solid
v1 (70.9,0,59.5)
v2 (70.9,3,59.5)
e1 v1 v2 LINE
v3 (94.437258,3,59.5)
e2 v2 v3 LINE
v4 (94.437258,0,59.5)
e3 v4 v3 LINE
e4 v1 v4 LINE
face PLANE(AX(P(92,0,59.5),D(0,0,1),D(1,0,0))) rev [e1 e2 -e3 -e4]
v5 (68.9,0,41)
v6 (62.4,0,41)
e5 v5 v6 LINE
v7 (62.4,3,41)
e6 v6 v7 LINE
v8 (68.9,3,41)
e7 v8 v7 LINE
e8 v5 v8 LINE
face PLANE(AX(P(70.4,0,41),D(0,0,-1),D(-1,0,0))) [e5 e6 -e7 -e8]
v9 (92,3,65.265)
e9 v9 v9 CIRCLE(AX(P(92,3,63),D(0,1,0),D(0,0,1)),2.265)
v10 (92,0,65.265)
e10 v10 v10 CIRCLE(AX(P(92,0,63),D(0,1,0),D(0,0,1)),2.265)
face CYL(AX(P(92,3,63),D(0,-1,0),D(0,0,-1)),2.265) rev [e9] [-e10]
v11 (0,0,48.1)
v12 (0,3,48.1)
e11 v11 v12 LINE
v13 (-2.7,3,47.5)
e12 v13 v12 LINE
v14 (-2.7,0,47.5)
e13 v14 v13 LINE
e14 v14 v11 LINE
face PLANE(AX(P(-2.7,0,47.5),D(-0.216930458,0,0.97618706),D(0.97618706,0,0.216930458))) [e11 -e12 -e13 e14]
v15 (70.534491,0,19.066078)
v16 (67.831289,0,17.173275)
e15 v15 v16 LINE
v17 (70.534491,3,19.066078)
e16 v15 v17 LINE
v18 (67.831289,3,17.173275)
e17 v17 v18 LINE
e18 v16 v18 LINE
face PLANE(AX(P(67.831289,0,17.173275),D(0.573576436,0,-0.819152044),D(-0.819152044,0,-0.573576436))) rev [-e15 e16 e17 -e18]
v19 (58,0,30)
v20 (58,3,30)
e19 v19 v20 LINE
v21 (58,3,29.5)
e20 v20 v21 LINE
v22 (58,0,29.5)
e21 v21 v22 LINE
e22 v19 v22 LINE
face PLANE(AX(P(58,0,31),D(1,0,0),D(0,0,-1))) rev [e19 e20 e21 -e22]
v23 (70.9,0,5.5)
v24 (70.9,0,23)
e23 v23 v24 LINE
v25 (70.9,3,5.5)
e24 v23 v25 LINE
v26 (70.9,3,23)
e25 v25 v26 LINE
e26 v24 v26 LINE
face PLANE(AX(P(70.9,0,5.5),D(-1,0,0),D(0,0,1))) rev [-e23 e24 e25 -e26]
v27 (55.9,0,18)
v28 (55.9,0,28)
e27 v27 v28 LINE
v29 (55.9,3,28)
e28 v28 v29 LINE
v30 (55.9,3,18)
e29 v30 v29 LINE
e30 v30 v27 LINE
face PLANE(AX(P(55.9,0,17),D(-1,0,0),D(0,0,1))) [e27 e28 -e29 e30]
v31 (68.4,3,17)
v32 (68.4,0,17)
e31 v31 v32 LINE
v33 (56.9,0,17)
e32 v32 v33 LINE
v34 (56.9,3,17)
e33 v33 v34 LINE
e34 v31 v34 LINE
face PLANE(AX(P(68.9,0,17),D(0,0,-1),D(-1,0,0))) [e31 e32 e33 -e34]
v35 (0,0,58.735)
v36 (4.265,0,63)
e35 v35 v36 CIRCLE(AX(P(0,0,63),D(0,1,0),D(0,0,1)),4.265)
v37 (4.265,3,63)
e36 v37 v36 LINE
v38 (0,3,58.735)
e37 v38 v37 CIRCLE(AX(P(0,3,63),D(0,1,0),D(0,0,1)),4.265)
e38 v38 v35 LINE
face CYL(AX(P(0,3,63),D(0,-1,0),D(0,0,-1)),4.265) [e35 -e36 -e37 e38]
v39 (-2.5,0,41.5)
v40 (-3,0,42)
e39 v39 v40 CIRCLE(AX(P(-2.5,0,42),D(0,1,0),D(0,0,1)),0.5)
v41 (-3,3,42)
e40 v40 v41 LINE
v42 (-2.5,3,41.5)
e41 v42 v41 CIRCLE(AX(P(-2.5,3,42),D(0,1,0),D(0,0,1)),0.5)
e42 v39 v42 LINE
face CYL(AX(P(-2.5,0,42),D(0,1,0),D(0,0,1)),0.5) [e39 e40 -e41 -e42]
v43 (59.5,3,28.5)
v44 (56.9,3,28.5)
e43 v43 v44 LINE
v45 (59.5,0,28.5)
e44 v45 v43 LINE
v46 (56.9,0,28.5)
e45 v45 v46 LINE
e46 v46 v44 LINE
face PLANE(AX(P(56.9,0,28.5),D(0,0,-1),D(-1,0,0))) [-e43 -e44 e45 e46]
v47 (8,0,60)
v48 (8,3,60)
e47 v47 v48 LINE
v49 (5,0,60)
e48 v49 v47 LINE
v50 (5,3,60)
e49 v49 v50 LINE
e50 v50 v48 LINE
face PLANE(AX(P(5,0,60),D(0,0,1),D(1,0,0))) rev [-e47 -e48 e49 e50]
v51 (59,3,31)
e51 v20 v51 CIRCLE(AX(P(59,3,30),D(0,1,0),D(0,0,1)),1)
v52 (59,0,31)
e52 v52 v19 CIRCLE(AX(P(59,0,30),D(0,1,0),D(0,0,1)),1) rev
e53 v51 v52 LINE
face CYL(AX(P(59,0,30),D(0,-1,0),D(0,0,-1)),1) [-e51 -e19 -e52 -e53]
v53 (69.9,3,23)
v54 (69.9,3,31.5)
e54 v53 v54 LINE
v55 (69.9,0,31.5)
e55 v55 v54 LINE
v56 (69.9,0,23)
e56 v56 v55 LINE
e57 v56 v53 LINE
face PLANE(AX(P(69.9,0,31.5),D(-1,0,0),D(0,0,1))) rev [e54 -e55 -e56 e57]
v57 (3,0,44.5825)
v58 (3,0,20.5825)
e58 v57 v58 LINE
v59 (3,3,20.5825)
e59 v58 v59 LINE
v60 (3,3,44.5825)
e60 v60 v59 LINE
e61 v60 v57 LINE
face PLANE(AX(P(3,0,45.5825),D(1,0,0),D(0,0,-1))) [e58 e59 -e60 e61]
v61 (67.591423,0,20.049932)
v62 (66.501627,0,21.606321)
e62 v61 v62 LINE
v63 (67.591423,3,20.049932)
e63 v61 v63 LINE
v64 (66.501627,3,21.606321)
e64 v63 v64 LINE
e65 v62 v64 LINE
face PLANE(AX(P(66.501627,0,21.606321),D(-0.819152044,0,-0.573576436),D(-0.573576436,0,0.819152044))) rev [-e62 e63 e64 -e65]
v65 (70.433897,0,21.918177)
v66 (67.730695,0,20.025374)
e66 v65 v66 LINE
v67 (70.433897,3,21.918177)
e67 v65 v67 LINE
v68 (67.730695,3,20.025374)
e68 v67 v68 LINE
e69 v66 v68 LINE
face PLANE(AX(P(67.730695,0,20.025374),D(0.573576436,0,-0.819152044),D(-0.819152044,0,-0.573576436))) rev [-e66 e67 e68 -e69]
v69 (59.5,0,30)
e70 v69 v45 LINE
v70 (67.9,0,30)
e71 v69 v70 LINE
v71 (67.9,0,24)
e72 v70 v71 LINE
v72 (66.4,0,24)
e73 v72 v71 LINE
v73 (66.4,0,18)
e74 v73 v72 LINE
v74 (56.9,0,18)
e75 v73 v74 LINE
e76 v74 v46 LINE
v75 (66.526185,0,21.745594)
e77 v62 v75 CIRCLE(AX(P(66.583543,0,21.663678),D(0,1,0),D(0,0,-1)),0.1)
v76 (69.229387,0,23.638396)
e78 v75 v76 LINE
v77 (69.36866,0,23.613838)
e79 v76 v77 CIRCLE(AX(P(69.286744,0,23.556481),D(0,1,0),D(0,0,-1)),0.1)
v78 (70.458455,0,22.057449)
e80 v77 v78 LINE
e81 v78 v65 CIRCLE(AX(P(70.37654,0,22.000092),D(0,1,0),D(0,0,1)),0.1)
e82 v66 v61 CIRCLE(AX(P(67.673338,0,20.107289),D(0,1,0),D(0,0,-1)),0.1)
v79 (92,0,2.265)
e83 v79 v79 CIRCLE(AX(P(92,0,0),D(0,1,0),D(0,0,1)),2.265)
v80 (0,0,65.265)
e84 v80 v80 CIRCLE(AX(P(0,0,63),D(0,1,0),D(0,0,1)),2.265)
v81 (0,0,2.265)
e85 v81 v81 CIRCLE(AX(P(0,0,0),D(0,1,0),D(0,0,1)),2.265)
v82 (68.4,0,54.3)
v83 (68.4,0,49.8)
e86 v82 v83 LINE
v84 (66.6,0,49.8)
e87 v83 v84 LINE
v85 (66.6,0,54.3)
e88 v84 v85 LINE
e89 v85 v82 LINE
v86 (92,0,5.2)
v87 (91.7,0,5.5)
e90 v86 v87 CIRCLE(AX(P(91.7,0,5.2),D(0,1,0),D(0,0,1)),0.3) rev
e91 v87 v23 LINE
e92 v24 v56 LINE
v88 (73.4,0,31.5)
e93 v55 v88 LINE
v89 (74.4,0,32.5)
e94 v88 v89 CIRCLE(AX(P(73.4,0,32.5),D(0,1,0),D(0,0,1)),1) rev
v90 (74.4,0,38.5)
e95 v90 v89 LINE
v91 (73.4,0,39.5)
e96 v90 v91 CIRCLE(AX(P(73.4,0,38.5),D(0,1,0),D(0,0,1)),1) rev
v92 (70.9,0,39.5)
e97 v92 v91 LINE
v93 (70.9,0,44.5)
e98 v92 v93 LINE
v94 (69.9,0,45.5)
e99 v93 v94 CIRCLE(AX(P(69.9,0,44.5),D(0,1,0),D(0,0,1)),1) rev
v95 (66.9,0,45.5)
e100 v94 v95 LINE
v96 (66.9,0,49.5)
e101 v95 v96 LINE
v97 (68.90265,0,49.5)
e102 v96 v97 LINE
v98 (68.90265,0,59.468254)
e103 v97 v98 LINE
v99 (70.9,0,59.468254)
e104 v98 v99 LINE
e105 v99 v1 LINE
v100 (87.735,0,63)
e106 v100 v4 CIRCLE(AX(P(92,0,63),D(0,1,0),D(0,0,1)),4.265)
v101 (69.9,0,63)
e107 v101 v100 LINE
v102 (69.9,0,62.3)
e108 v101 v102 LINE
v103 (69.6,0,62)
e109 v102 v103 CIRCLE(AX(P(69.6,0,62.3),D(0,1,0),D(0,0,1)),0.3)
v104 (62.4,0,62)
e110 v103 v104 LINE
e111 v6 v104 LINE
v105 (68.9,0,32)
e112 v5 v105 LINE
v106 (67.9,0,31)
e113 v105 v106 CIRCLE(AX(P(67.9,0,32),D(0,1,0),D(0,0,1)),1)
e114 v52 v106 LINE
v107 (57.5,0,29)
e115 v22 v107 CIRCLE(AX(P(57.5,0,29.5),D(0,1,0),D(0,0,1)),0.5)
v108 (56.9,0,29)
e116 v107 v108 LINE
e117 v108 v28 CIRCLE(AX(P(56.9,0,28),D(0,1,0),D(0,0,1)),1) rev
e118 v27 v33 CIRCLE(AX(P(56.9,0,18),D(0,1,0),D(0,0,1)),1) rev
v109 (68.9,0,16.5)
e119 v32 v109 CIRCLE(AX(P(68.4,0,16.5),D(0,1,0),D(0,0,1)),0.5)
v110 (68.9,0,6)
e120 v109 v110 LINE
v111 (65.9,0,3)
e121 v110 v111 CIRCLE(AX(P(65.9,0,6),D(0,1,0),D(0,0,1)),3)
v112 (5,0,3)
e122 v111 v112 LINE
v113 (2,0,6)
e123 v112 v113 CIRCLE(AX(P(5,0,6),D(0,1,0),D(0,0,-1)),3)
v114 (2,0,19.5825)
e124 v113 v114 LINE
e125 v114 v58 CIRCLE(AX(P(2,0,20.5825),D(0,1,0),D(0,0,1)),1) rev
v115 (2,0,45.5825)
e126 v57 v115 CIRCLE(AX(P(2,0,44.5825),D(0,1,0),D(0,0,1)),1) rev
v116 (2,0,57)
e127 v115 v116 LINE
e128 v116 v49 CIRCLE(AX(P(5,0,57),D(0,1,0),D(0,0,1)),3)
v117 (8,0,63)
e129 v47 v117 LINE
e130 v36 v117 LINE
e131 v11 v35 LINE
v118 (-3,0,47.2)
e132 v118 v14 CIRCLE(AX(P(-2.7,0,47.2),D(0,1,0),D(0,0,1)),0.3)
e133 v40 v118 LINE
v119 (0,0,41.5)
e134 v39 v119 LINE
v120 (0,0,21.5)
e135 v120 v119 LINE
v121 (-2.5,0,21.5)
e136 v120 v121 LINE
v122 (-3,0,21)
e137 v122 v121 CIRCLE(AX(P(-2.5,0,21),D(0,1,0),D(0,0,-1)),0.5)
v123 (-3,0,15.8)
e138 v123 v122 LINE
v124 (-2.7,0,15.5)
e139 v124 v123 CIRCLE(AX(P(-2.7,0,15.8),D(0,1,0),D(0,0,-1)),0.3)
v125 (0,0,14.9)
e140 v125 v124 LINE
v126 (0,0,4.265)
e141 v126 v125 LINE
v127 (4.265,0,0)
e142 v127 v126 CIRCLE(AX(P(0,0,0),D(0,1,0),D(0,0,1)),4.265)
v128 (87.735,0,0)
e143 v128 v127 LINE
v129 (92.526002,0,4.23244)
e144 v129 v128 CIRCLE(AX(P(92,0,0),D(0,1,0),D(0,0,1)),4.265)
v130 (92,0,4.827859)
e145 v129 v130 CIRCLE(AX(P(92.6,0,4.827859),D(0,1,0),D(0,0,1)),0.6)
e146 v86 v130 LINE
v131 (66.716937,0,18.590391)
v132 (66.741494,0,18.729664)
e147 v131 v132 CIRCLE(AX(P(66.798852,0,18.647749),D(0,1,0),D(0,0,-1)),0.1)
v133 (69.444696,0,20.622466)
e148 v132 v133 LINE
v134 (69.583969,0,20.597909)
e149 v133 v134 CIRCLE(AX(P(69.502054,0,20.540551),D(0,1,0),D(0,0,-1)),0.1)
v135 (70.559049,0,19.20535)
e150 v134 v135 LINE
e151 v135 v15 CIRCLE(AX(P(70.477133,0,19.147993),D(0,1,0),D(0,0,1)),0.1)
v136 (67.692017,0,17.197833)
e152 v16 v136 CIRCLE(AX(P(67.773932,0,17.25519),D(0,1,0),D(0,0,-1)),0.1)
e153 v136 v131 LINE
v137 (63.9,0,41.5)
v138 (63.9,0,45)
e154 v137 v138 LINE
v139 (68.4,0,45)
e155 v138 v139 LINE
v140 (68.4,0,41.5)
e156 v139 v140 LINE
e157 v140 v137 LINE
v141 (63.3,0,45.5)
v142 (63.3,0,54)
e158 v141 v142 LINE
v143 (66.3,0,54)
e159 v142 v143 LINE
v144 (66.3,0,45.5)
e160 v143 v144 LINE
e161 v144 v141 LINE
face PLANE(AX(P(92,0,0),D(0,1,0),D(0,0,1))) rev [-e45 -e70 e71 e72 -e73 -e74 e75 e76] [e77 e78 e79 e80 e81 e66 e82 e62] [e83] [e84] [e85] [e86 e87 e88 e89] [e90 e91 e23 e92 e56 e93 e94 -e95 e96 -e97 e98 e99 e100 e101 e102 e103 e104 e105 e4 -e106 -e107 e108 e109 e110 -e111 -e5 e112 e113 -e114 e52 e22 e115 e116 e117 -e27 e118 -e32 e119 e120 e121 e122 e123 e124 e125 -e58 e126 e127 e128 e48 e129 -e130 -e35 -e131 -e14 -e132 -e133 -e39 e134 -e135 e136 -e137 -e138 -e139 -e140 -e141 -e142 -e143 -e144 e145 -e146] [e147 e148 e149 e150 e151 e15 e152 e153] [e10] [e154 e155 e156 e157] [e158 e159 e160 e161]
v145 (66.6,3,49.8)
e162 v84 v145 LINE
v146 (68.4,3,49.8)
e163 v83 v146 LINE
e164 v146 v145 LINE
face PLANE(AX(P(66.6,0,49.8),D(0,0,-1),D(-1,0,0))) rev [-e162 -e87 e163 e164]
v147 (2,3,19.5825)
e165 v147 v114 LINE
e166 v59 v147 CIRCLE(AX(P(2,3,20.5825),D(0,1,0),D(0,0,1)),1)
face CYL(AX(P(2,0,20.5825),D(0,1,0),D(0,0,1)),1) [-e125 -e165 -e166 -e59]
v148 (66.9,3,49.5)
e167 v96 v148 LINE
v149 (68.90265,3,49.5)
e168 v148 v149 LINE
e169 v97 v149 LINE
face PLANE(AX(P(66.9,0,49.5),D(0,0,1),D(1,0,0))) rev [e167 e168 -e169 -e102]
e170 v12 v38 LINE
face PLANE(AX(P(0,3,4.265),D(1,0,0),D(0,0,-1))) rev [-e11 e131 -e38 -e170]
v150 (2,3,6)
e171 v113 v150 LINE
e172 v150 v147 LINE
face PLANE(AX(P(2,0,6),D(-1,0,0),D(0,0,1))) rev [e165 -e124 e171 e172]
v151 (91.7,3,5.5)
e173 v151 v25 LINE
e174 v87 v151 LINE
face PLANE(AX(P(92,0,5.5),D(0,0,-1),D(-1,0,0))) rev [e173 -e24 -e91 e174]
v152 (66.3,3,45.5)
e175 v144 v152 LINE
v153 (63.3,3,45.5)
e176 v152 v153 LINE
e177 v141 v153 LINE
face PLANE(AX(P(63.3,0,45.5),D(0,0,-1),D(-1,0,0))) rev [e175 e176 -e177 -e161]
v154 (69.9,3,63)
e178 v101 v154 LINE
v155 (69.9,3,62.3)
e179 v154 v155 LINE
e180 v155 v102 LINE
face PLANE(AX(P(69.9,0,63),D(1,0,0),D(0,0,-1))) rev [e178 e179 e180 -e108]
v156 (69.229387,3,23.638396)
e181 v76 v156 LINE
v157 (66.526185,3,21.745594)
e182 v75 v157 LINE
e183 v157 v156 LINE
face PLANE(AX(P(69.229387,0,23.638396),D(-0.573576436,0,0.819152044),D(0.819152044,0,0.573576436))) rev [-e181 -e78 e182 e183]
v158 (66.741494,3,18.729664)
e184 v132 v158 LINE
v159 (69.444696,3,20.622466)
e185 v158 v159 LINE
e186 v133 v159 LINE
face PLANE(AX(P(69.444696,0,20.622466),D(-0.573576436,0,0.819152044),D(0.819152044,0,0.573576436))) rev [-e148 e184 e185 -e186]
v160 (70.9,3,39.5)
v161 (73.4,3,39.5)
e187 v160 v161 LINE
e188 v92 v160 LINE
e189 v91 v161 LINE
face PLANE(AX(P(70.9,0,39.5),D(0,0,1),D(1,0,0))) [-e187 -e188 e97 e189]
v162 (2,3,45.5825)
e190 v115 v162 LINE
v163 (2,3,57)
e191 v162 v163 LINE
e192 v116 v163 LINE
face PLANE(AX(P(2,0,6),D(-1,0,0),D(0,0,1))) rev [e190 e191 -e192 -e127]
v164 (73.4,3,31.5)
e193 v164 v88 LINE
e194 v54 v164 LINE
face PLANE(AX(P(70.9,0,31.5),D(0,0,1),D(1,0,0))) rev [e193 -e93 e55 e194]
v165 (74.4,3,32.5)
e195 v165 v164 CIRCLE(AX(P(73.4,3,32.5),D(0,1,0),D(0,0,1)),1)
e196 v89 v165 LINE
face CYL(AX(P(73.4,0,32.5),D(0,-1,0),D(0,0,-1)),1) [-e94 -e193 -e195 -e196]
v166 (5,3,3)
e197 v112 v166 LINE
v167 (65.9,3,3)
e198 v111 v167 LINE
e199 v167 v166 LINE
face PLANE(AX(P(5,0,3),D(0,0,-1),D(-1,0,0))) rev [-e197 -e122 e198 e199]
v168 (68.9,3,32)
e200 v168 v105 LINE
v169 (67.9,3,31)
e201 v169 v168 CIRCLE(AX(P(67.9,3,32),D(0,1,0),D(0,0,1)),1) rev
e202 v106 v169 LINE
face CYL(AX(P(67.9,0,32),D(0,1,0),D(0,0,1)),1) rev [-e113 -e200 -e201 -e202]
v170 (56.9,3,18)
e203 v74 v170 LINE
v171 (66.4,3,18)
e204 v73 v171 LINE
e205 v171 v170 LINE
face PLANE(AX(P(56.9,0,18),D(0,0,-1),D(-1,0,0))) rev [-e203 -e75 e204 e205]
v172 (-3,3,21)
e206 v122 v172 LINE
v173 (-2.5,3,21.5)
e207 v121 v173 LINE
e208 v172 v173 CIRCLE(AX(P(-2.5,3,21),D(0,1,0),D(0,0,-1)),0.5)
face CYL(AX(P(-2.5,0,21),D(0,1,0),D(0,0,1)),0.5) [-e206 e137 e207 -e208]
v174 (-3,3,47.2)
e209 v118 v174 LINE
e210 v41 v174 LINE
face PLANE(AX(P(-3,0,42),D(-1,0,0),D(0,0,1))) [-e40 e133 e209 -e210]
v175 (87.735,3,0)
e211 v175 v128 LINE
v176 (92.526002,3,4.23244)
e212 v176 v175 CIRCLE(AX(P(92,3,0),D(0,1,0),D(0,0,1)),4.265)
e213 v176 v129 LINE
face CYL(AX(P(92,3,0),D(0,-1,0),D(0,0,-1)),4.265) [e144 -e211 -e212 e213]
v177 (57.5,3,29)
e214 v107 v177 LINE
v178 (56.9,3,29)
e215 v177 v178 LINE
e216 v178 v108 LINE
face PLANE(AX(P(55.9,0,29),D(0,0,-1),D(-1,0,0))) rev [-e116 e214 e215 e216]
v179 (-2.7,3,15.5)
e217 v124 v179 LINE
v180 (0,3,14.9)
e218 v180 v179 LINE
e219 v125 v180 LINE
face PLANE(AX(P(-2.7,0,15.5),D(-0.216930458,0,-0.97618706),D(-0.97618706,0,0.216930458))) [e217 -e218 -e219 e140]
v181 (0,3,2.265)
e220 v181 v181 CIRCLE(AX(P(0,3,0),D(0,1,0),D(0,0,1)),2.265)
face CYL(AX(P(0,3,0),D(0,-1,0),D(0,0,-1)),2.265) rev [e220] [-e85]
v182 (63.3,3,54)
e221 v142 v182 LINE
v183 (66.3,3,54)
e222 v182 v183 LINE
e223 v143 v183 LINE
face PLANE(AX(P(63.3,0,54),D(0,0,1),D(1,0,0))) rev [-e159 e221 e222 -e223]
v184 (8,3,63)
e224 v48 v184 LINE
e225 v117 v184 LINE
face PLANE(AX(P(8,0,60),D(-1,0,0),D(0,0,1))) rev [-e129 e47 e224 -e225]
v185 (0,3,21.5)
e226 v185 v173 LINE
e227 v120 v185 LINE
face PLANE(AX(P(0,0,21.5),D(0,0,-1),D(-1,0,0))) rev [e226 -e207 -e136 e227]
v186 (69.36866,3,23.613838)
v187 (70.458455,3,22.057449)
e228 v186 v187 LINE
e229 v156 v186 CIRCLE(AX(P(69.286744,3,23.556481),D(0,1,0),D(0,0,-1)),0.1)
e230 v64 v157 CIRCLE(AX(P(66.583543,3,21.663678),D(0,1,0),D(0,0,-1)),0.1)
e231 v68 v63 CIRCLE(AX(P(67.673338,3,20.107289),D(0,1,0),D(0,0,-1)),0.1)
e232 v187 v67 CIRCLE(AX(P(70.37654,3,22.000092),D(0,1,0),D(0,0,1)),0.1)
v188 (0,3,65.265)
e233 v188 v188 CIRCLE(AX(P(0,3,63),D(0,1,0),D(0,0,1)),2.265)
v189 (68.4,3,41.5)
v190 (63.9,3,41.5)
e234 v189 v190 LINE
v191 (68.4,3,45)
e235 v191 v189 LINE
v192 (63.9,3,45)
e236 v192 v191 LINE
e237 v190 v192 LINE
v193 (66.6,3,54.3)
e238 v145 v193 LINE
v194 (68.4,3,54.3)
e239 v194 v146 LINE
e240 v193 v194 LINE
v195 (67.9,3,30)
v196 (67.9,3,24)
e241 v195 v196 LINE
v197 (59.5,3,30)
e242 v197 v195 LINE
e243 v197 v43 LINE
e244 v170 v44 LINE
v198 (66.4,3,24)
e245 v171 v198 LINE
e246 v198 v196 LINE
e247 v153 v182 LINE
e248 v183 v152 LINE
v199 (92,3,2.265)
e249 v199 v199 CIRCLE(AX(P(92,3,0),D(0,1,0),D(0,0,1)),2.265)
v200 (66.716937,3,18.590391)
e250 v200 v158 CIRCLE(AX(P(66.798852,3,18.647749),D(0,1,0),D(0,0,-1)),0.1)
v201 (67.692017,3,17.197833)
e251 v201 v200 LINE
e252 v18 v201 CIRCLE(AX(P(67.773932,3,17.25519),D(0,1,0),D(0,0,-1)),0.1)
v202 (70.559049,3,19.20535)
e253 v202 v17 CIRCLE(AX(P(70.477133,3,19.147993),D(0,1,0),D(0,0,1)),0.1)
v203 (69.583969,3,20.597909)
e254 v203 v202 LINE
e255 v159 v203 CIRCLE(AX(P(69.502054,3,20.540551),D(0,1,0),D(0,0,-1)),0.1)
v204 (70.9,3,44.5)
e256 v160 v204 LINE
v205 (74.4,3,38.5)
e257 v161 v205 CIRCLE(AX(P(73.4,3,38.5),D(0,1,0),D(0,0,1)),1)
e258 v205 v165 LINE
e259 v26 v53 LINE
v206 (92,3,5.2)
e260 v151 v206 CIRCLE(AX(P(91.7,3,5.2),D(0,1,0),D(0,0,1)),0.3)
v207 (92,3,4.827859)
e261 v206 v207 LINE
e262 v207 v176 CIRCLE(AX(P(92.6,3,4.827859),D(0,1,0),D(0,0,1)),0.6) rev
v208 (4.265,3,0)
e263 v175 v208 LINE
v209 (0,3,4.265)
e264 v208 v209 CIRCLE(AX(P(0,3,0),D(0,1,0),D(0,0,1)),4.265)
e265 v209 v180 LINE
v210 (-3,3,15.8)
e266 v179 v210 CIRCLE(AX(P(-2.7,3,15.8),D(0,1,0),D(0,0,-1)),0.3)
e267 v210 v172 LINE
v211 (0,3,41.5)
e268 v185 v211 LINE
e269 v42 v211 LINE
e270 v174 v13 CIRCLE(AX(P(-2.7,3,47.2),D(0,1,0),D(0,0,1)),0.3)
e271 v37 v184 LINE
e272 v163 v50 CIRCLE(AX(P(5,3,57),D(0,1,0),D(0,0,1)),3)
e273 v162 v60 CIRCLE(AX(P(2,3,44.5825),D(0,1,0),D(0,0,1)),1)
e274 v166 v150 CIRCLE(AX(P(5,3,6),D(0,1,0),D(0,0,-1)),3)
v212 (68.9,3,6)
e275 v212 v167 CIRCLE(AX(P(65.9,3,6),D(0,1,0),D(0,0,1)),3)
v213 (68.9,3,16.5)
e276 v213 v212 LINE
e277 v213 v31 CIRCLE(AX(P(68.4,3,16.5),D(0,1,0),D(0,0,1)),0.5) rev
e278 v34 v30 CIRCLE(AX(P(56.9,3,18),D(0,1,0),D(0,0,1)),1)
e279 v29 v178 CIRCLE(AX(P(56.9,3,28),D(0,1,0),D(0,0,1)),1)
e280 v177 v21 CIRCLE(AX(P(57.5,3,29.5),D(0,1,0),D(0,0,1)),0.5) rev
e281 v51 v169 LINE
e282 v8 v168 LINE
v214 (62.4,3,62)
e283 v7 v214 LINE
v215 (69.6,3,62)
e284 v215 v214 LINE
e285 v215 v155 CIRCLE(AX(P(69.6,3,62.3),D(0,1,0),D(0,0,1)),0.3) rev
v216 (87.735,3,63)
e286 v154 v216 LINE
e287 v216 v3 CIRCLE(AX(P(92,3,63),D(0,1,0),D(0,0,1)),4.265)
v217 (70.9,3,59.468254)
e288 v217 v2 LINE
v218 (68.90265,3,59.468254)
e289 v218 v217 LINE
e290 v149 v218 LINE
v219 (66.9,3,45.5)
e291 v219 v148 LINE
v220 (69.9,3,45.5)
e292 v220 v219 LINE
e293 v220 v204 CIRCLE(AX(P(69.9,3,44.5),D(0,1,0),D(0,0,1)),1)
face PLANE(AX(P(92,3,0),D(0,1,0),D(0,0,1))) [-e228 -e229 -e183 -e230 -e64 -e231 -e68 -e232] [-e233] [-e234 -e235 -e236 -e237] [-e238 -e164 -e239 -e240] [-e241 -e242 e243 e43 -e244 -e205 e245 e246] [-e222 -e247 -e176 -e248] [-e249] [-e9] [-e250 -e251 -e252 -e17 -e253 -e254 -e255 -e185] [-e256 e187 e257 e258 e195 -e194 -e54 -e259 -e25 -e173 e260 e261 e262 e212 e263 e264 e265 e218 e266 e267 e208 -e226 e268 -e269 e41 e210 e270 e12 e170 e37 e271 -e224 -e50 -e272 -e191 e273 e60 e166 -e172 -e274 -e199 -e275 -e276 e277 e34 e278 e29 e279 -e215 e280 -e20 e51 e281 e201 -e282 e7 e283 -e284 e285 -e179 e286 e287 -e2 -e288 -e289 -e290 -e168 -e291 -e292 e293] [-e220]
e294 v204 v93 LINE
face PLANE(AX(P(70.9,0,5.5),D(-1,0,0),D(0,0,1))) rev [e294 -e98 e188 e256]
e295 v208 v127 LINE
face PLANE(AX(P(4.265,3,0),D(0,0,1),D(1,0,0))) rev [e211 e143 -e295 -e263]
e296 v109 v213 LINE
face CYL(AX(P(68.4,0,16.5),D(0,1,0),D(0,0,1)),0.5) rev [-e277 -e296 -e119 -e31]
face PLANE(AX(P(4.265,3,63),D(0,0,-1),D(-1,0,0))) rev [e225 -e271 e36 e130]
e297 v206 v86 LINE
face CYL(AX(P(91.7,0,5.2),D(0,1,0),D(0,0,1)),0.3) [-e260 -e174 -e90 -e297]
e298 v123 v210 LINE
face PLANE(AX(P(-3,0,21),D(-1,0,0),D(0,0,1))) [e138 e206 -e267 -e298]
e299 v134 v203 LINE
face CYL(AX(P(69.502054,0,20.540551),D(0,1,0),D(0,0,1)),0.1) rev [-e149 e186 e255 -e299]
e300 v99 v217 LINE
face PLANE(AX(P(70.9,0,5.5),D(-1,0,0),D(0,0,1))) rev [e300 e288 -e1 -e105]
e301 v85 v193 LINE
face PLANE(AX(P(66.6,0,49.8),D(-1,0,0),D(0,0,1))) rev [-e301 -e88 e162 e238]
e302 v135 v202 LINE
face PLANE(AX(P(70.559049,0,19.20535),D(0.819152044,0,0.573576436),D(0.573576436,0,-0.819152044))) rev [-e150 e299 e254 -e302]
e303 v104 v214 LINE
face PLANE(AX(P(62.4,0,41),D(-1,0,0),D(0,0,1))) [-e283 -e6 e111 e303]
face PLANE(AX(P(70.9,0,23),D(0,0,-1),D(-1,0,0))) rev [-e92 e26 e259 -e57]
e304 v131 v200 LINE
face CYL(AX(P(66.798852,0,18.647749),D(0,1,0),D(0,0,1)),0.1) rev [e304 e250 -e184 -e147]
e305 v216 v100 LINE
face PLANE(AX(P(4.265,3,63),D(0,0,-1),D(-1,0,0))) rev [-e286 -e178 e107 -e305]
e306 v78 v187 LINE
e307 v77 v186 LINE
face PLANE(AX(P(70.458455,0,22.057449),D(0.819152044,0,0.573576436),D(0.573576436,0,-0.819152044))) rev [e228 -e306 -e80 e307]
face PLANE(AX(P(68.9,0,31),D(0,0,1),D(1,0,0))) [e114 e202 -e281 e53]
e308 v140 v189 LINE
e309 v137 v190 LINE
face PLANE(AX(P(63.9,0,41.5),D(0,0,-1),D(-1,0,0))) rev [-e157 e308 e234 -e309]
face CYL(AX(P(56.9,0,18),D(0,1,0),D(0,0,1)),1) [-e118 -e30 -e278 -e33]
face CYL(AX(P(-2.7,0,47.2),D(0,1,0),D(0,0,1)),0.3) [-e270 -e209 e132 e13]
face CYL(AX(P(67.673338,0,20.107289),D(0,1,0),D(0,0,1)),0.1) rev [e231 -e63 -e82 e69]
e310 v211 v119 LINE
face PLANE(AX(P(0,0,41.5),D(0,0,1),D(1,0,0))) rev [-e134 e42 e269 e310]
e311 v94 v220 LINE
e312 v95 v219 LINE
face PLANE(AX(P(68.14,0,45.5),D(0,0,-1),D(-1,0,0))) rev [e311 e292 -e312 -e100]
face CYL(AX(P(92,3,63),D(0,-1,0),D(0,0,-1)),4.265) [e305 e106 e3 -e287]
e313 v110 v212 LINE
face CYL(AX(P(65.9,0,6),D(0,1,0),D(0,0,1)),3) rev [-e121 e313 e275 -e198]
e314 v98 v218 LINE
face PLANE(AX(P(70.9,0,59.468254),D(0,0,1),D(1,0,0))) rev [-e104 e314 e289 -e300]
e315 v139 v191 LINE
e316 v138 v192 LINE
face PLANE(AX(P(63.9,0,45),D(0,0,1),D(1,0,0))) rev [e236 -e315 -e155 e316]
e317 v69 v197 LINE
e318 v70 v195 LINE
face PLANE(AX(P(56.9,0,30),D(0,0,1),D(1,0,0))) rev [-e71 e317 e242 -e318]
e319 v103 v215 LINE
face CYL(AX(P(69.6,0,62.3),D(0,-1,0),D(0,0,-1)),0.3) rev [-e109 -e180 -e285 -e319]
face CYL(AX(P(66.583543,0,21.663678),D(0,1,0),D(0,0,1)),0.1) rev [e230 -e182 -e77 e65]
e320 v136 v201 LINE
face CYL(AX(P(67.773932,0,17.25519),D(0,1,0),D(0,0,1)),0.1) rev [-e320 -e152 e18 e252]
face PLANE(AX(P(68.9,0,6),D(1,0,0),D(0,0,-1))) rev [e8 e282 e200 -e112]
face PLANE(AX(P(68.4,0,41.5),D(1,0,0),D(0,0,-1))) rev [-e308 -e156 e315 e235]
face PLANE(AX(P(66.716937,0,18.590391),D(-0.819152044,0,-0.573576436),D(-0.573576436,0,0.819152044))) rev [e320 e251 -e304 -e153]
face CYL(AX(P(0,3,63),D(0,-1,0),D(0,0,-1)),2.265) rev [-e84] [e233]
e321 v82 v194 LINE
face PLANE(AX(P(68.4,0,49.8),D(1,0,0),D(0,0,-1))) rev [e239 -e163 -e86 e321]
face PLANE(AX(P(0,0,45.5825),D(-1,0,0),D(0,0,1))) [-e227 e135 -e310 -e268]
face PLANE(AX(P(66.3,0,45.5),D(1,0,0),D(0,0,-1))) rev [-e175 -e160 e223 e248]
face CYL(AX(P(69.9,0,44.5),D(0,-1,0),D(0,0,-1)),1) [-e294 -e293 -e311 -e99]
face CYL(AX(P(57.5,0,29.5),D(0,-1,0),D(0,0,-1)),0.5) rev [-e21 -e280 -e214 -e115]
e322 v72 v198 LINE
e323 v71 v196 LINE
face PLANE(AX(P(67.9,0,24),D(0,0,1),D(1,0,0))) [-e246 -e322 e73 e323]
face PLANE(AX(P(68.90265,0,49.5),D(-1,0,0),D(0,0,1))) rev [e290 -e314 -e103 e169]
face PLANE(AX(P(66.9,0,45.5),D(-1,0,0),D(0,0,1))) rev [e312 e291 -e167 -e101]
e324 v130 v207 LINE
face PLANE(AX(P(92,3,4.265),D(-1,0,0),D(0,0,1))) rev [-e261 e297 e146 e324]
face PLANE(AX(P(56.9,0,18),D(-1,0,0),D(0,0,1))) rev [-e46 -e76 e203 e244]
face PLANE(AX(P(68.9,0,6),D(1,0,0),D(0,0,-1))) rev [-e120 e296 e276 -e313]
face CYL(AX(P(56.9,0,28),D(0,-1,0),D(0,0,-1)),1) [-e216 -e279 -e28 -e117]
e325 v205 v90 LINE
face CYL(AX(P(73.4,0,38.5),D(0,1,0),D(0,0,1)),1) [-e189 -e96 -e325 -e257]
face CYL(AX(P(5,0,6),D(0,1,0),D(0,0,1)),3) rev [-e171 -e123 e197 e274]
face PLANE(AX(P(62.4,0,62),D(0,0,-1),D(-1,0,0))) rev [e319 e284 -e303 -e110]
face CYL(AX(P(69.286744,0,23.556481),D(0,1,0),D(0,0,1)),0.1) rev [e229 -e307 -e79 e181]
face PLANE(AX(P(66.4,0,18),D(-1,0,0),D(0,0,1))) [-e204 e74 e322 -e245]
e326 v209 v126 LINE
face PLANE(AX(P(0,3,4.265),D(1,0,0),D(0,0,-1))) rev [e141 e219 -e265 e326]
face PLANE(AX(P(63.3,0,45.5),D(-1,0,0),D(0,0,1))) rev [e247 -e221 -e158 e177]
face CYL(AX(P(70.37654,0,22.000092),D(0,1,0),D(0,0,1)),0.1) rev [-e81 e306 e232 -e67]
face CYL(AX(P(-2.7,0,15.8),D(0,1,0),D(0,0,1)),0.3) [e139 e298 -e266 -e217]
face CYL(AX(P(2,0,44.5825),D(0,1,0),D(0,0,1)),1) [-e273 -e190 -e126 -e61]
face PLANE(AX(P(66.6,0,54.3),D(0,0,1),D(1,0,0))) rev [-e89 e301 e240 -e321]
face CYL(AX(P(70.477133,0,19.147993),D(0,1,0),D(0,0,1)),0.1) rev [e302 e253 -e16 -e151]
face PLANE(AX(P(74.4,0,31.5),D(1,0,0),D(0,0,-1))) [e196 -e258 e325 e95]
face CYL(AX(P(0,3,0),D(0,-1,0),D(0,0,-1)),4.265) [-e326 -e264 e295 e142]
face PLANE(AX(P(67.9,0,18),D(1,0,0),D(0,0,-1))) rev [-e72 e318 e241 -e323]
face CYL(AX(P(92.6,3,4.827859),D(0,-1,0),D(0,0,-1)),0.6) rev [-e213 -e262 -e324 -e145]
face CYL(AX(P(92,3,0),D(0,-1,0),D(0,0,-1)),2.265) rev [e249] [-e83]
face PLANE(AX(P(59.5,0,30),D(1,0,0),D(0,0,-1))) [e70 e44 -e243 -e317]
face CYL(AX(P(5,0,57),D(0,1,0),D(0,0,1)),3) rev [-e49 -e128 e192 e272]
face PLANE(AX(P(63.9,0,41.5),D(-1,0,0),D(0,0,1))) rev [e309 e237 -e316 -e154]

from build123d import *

# Parameters (mm, degrees)
SKETCH1_R            = 2.265
BOSS_EXTRUDE1_DEPTH  = 3
SKETCH2_W            = 6.5
SKETCH2_H            = 20
CUT_EXTRUDE1_DEPTH   = 3
BOSS_EXTRUDE2_DEPTH  = 3
CUT_EXTRUDE2_DEPTH   = 3
SKETCH5_W            = 3
SKETCH5_H            = 26
BOSS_EXTRUDE6_DEPTH  = 3
FILLET1_R            = 1
SKETCH9_W            = 57
SKETCH9_H            = 3
CUT_EXTRUDE4_DEPTH   = 3
SKETCH11_W           = 21.1
SKETCH11_H           = 54
CUT_EXTRUDE6_DEPTH   = 3
SKETCH12_W           = 5.606838984
SKETCH12_H           = 3.16637745
CUT_EXTRUDE7_DEPTH   = 3
SKETCH14_W           = 13
SKETCH14_H           = 14
SKETCH14_W_2         = 11
SKETCH14_H_2         = 12
BOSS_EXTRUDE9_DEPTH  = 3
SKETCH15_W           = 1
SKETCH15_H           = 8.5
CUT_EXTRUDE8_DEPTH   = 3
SKETCH16_W           = 3.5
SKETCH16_H           = 8
BOSS_EXTRUDE10_DEPTH = 3
SKETCH17_W           = 1.5
SKETCH17_H           = 6
BOSS_EXTRUDE11_DEPTH = 3
CUT_EXTRUDE9_DEPTH   = 3
SKETCH19_W           = 2.1
SKETCH19_H           = 2
CUT_EXTRUDE10_DEPTH  = 3
BOSS_EXTRUDE16_DEPTH = 3
FILLET2_R            = 1
FILLET3_R            = 0.5
FILLET4_R            = 0.5
FILLET6_R            = 1
SKETCH21_W           = 8
SKETCH21_H           = 22
BOSS_EXTRUDE13_DEPTH = 3
SKETCH24_W           = 4
SKETCH24_H           = 6.433647318
CUT_EXTRUDE12_DEPTH  = 3
FILLET9_R            = 1
SKETCH25_W           = 4.5
SKETCH25_H           = 3.5
SKETCH25_W_2         = 4
SKETCH25_H_2         = 4
CUT_EXTRUDE14_DEPTH  = 3
SKETCH26_W           = 4
SKETCH26_H           = 2.433647318
BOSS_EXTRUDE15_DEPTH = 3
SKETCH27_W           = 3
SKETCH27_H           = 8.5
CUT_EXTRUDE15_DEPTH  = 3
SKETCH28_W           = 1.8
SKETCH28_H           = 4.5
CUT_EXTRUDE16_DEPTH  = 3
SKETCH29_W           = 1.997350186
SKETCH29_H           = 9.968253882
CUT_EXTRUDE17_DEPTH  = 3
SKETCH30_W           = 7.5
SKETCH30_H           = 1
CUT_EXTRUDE18_DEPTH  = 3
FILLET11_R           = 0.3
FILLET12_R           = 0.6
FILLET13_R           = 0.3


with BuildPart() as part:
    # Sketch1 → Boss-Extrude1 (new body)
    with BuildSketch(Plane(origin=(0, 0, 0), x_dir=(1, 0, 0), z_dir=(0, 1, 0))):
        with BuildLine():
            Line((0, -4.265), (0, -58.735))
            ThreePointArc((0, -58.735), (-3.015810422, -66.015810422), (4.265, -63))
            Line((4.265, -63), (87.735, -63))
            ThreePointArc((87.735, -63), (95.015810422, -66.015810422), (92, -58.735))
            Line((92, -58.735), (92, -4.265))
            ThreePointArc((92, -4.265), (95.015810422, 3.015810422), (87.735, 0))
            Line((87.735, 0), (4.265, 0))
            ThreePointArc((4.265, 0), (-3.015810422, 3.015810422), (0, -4.265))
        make_face()
        with Locations(Location((0, 0, 0), (0, 0, 270))):
            Circle(SKETCH1_R, mode=Mode.SUBTRACT)
        with Locations(Location((92, 0, 0), (0, 0, 270))):
            Circle(SKETCH1_R, mode=Mode.SUBTRACT)
        with Locations(Location((92, -63, 0), (0, 0, 270))):
            Circle(SKETCH1_R, mode=Mode.SUBTRACT)
        with Locations(Location((0, -63, 0), (0, 0, 270))):
            Circle(SKETCH1_R, mode=Mode.SUBTRACT)
    extrude(amount=BOSS_EXTRUDE1_DEPTH)

    # Sketch2 → Cut-Extrude1 (cut)
    with BuildSketch(Plane(origin=(0, 3, 0), x_dir=(1, 0, 0), z_dir=(0, 1, 0))):
        with Locations((3.25, -31.5)):
            Rectangle(SKETCH2_W, SKETCH2_H)
    extrude(amount=-CUT_EXTRUDE1_DEPTH, mode=Mode.SUBTRACT)

    # Sketch3 → Boss-Extrude2 (add)
    with BuildSketch(Plane(origin=(0, 3, 0), x_dir=(1, 0, 0), z_dir=(0, 1, 0))):
        with BuildLine():
            Line((-2.7, -15.5), (0, -14.9))
            Line((0, -14.9), (0, -21.5))
            Line((0, -21.5), (-2.5, -21.5))
            ThreePointArc((-2.5, -21.5), (-2.853553391, -21.353553391), (-3, -21))
            Line((-3, -21), (-3, -15.8))
            ThreePointArc((-3, -15.8), (-2.912132034, -15.587867966), (-2.7, -15.5))
        make_face()
        with BuildLine():
            Line((-3, -42), (-3, -47.2))
            ThreePointArc((-3, -47.2), (-2.912132034, -47.412132034), (-2.7, -47.5))
            Line((-2.7, -47.5), (0, -48.1))
            Line((0, -48.1), (0, -41.5))
            Line((0, -41.5), (-2.5, -41.5))
            ThreePointArc((-2.5, -41.5), (-2.853553391, -41.646446609), (-3, -42))
        make_face()
    extrude(amount=-BOSS_EXTRUDE2_DEPTH)

    # Sketch6 → Cut-Extrude2 (cut)
    with BuildSketch(Plane(origin=(0, 3, 0), x_dir=(1, 0, 0), z_dir=(0, 1, 0))):
        with BuildLine():
            Line((5, -3), (65.9, -3))
            ThreePointArc((65.9, -3), (68.021320344, -3.878679656), (68.9, -6))
            Line((68.9, -6), (68.9, -57))
            ThreePointArc((68.9, -57), (68.021320344, -59.121320344), (65.9, -60))
            Line((65.9, -60), (5, -60))
            ThreePointArc((5, -60), (2.878679656, -59.121320344), (2, -57))
            Line((2, -57), (2, -6))
            ThreePointArc((2, -6), (2.878679656, -3.878679656), (5, -3))
        make_face()
    extrude(amount=-CUT_EXTRUDE2_DEPTH, mode=Mode.SUBTRACT)

    # Sketch5 → Boss-Extrude6 (add)
    with BuildSketch(Plane(origin=(0, 3, 0), x_dir=(1, 0, 0), z_dir=(0, 1, 0))):
        with Locations((1.5, -32.5825)):
            Rectangle(SKETCH5_W, SKETCH5_H)
    extrude(amount=-BOSS_EXTRUDE6_DEPTH)

    # Fillet1
    fillet1_edges = [part.edges().sort_by_distance(p)[0] for p in [
        (3, 1.5, 45.5825),
        (3, 1.5, 19.5825),
    ]]
    fillet(fillet1_edges, radius=FILLET1_R - 0.0001)  # a hair under: the kernel refuses the full size

    # Sketch9 → Cut-Extrude4 (cut)
    with BuildSketch(Plane(origin=(0, 3, 0), x_dir=(1, 0, 0), z_dir=(0, 1, 0))):
        with Locations((36.5, -61.5)):
            Rectangle(SKETCH9_W, SKETCH9_H)
    extrude(amount=-CUT_EXTRUDE4_DEPTH, mode=Mode.SUBTRACT)

    # Sketch11 → Cut-Extrude6 (cut)
    with BuildSketch(Plane(origin=(0, 3, 0), x_dir=(1, 0, 0), z_dir=(0, 1, 0))):
        with Locations((81.45, -32.5)):
            Rectangle(SKETCH11_W, SKETCH11_H)
    extrude(amount=-CUT_EXTRUDE6_DEPTH, mode=Mode.SUBTRACT)

    # Sketch12 → Cut-Extrude7 (cut)
    with BuildSketch(Plane(origin=(0, 3, 0), x_dir=(1, 0, 0), z_dir=(0, 1, 0))):
        with Locations((94.803419492, -57.916811275)):
            Rectangle(SKETCH12_W, SKETCH12_H)
    extrude(amount=-CUT_EXTRUDE7_DEPTH, mode=Mode.SUBTRACT)

    # Sketch14 → Boss-Extrude9 (add)
    with BuildSketch(Plane(origin=(0, 3, 0), x_dir=(1, 0, 0), z_dir=(0, 1, 0))):
        with Locations((62.4, -24)):
            Rectangle(SKETCH14_W, SKETCH14_H)
        with Locations((62.4, -24)):
            Rectangle(SKETCH14_W_2, SKETCH14_H_2, mode=Mode.SUBTRACT)
    extrude(amount=-BOSS_EXTRUDE9_DEPTH)

    # Sketch15 → Cut-Extrude8 (cut)
    with BuildSketch(Plane(origin=(0, 3, 0), x_dir=(1, 0, 0), z_dir=(0, 1, 0))):
        with Locations((70.4, -27.25)):
            Rectangle(SKETCH15_W, SKETCH15_H)
    extrude(amount=-CUT_EXTRUDE8_DEPTH, mode=Mode.SUBTRACT)

    # Sketch16 → Boss-Extrude10 (add)
    with BuildSketch(Plane(origin=(0, 3, 0), x_dir=(1, 0, 0), z_dir=(0, 1, 0))):
        with Locations((72.65, -35.5)):
            Rectangle(SKETCH16_W, SKETCH16_H)
    extrude(amount=-BOSS_EXTRUDE10_DEPTH)

    # Sketch17 → Boss-Extrude11 (add)
    with BuildSketch(Plane(origin=(0, 3, 0), x_dir=(1, 0, 0), z_dir=(0, 1, 0))):
        with Locations((67.15, -21)):
            Rectangle(SKETCH17_W, SKETCH17_H)
    extrude(amount=-BOSS_EXTRUDE11_DEPTH)

    # Sketch18 → Cut-Extrude9 (cut)
    with BuildSketch(Plane(origin=(0, 3, 0), x_dir=(1, 0, 0), z_dir=(0, 1, 0))):
        with BuildLine():
            Line((66.716936581, -18.590391311), (67.692016523, -17.197832836))
            ThreePointArc((67.692016523, -17.197832836), (67.75656691, -17.156709704), (67.831289371, -17.173275275))
            Line((67.831289371, -17.173275275), (70.534491117, -19.066077515))
            ThreePointArc((70.534491117, -19.066077515), (70.575614249, -19.130627902), (70.559048678, -19.205350363))
            Line((70.559048678, -19.205350363), (69.583968736, -20.597908838))
            ThreePointArc((69.583968736, -20.597908838), (69.51941835, -20.63903197), (69.444695888, -20.622466399))
            Line((69.444695888, -20.622466399), (66.741494142, -18.729664159))
            ThreePointArc((66.741494142, -18.729664159), (66.70037101, -18.665113772), (66.716936581, -18.590391311))
        make_face()
        with BuildLine():
            Line((66.501627394, -21.606320712), (67.591422623, -20.049931828))
            ThreePointArc((67.591422623, -20.049931828), (67.65597301, -20.008808696), (67.730695471, -20.025374267))
            Line((67.730695471, -20.025374267), (70.433897217, -21.918176507))
            ThreePointArc((70.433897217, -21.918176507), (70.475020349, -21.982726894), (70.458454778, -22.057449355))
            Line((70.458454778, -22.057449355), (69.368659549, -23.613838239))
            ThreePointArc((69.368659549, -23.613838239), (69.304109162, -23.654961371), (69.229386701, -23.6383958))
            Line((69.229386701, -23.6383958), (66.526184955, -21.74559356))
            ThreePointArc((66.526184955, -21.74559356), (66.485061823, -21.681043173), (66.501627394, -21.606320712))
        make_face()
    extrude(amount=-CUT_EXTRUDE9_DEPTH, mode=Mode.SUBTRACT)

    # Sketch19 → Cut-Extrude10 (cut)
    with BuildSketch(Plane(origin=(0, 3, 0), x_dir=(1, 0, 0), z_dir=(0, 1, 0))):
        with Locations((56.95, -30)):
            Rectangle(SKETCH19_W, SKETCH19_H)
    extrude(amount=-CUT_EXTRUDE10_DEPTH, mode=Mode.SUBTRACT)

    # Sketch31 → Boss-Extrude16 (add)
    with BuildSketch(Plane(origin=(0, 3, 0), x_dir=(1, 0, 0), z_dir=(0, 1, 0))):
        Polygon((58, -30), (59.5, -30), (59.5, -28.5), (58, -28.5), (56.9, -28.5), (56.9, -29), (58, -29), align=None)
    extrude(amount=-BOSS_EXTRUDE16_DEPTH)

    # Fillet2
    fillet2_edges = [part.edges().sort_by_distance(p)[0] for p in [
        (68.9, 1.5, 31),
        (55.9, 1.5, 17),
        (55.9, 1.5, 29),
        (58, 1.5, 31),
    ]]
    fillet(fillet2_edges, radius=FILLET2_R)

    # Fillet3
    fillet3_edges = [part.edges().sort_by_distance(p)[0] for p in [
        (68.9, 1.5, 17),
    ]]
    fillet(fillet3_edges, radius=FILLET3_R)

    # Fillet4
    fillet4_edges = [part.edges().sort_by_distance(p)[0] for p in [
        (58, 1.5, 29),
    ]]
    fillet(fillet4_edges, radius=FILLET4_R)

    # Fillet6
    fillet6_edges = [part.edges().sort_by_distance(p)[0] for p in [
        (74.4, 1.5, 31.5),
        (74.4, 1.5, 39.5),
    ]]
    fillet(fillet6_edges, radius=FILLET6_R)

    # Sketch21 → Boss-Extrude13 (add)
    with BuildSketch(Plane(origin=(0, 3, 0), x_dir=(1, 0, 0), z_dir=(0, 1, 0))):
        with Locations((66.4, -52)):
            Rectangle(SKETCH21_W, SKETCH21_H)
    extrude(amount=-BOSS_EXTRUDE13_DEPTH)

    # Sketch24 → Cut-Extrude12 (cut)
    with BuildSketch(Plane(origin=(0, 3, 0), x_dir=(1, 0, 0), z_dir=(0, 1, 0))):
        with Locations((70.14, -48.716823659)):
            Rectangle(SKETCH24_W, SKETCH24_H)
    extrude(amount=-CUT_EXTRUDE12_DEPTH, mode=Mode.SUBTRACT)

    # Fillet9
    fillet9_edges = [part.edges().sort_by_distance(p)[0] for p in [
        (70.9, 1.5, 45.5),
    ]]
    fillet(fillet9_edges, radius=FILLET9_R)

    # Sketch25 → Cut-Extrude14 (cut)
    with BuildSketch(Plane(origin=(0, 3, 0), x_dir=(1, 0, 0), z_dir=(0, 1, 0))):
        with Locations((66.15, -43.25)):
            Rectangle(SKETCH25_W, SKETCH25_H)
        with Locations((68.9, -47.5)):
            Rectangle(SKETCH25_W_2, SKETCH25_H_2)
    extrude(amount=-CUT_EXTRUDE14_DEPTH, mode=Mode.SUBTRACT)

    # Sketch26 → Boss-Extrude15 (add)
    with BuildSketch(Plane(origin=(0, 3, 0), x_dir=(1, 0, 0), z_dir=(0, 1, 0))):
        with Locations((68.9, -50.716823659)):
            Rectangle(SKETCH26_W, SKETCH26_H)
    extrude(amount=-BOSS_EXTRUDE15_DEPTH)

    # Sketch27 → Cut-Extrude15 (cut)
    with BuildSketch(Plane(origin=(0, 3, 0), x_dir=(1, 0, 0), z_dir=(0, 1, 0))):
        with Locations((64.8, -49.75)):
            Rectangle(SKETCH27_W, SKETCH27_H)
    extrude(amount=-CUT_EXTRUDE15_DEPTH, mode=Mode.SUBTRACT)

    # Sketch28 → Cut-Extrude16 (cut)
    with BuildSketch(Plane(origin=(0, 3, 0), x_dir=(1, 0, 0), z_dir=(0, 1, 0))):
        with Locations((67.5, -52.05)):
            Rectangle(SKETCH28_W, SKETCH28_H)
    extrude(amount=-CUT_EXTRUDE16_DEPTH, mode=Mode.SUBTRACT)

    # Sketch29 → Cut-Extrude17 (cut)
    with BuildSketch(Plane(origin=(0, 3, 0), x_dir=(1, 0, 0), z_dir=(0, 1, 0))):
        with Locations((69.901324907, -54.484126941)):
            Rectangle(SKETCH29_W, SKETCH29_H)
    extrude(amount=-CUT_EXTRUDE17_DEPTH, mode=Mode.SUBTRACT)

    # Sketch30 → Cut-Extrude18 (cut)
    with BuildSketch(Plane(origin=(0, 3, 0), x_dir=(1, 0, 0), z_dir=(0, 1, 0))):
        with Locations((66.15, -62.5)):
            Rectangle(SKETCH30_W, SKETCH30_H)
    extrude(amount=-CUT_EXTRUDE18_DEPTH, mode=Mode.SUBTRACT)

    # Fillet11
    fillet11_edges = [part.edges().sort_by_distance(p)[0] for p in [
        (69.9, 1.5, 62),
    ]]
    fillet(fillet11_edges, radius=FILLET11_R)

    # Fillet12
    fillet12_edges = [part.edges().sort_by_distance(p)[0] for p in [
        (92, 1.5, 4.265),
    ]]
    fillet(fillet12_edges, radius=FILLET12_R)

    # Fillet13
    fillet13_edges = [part.edges().sort_by_distance(p)[0] for p in [
        (92, 1.5, 5.5),
    ]]
    fillet(fillet13_edges, radius=FILLET13_R)


solid = part.part
